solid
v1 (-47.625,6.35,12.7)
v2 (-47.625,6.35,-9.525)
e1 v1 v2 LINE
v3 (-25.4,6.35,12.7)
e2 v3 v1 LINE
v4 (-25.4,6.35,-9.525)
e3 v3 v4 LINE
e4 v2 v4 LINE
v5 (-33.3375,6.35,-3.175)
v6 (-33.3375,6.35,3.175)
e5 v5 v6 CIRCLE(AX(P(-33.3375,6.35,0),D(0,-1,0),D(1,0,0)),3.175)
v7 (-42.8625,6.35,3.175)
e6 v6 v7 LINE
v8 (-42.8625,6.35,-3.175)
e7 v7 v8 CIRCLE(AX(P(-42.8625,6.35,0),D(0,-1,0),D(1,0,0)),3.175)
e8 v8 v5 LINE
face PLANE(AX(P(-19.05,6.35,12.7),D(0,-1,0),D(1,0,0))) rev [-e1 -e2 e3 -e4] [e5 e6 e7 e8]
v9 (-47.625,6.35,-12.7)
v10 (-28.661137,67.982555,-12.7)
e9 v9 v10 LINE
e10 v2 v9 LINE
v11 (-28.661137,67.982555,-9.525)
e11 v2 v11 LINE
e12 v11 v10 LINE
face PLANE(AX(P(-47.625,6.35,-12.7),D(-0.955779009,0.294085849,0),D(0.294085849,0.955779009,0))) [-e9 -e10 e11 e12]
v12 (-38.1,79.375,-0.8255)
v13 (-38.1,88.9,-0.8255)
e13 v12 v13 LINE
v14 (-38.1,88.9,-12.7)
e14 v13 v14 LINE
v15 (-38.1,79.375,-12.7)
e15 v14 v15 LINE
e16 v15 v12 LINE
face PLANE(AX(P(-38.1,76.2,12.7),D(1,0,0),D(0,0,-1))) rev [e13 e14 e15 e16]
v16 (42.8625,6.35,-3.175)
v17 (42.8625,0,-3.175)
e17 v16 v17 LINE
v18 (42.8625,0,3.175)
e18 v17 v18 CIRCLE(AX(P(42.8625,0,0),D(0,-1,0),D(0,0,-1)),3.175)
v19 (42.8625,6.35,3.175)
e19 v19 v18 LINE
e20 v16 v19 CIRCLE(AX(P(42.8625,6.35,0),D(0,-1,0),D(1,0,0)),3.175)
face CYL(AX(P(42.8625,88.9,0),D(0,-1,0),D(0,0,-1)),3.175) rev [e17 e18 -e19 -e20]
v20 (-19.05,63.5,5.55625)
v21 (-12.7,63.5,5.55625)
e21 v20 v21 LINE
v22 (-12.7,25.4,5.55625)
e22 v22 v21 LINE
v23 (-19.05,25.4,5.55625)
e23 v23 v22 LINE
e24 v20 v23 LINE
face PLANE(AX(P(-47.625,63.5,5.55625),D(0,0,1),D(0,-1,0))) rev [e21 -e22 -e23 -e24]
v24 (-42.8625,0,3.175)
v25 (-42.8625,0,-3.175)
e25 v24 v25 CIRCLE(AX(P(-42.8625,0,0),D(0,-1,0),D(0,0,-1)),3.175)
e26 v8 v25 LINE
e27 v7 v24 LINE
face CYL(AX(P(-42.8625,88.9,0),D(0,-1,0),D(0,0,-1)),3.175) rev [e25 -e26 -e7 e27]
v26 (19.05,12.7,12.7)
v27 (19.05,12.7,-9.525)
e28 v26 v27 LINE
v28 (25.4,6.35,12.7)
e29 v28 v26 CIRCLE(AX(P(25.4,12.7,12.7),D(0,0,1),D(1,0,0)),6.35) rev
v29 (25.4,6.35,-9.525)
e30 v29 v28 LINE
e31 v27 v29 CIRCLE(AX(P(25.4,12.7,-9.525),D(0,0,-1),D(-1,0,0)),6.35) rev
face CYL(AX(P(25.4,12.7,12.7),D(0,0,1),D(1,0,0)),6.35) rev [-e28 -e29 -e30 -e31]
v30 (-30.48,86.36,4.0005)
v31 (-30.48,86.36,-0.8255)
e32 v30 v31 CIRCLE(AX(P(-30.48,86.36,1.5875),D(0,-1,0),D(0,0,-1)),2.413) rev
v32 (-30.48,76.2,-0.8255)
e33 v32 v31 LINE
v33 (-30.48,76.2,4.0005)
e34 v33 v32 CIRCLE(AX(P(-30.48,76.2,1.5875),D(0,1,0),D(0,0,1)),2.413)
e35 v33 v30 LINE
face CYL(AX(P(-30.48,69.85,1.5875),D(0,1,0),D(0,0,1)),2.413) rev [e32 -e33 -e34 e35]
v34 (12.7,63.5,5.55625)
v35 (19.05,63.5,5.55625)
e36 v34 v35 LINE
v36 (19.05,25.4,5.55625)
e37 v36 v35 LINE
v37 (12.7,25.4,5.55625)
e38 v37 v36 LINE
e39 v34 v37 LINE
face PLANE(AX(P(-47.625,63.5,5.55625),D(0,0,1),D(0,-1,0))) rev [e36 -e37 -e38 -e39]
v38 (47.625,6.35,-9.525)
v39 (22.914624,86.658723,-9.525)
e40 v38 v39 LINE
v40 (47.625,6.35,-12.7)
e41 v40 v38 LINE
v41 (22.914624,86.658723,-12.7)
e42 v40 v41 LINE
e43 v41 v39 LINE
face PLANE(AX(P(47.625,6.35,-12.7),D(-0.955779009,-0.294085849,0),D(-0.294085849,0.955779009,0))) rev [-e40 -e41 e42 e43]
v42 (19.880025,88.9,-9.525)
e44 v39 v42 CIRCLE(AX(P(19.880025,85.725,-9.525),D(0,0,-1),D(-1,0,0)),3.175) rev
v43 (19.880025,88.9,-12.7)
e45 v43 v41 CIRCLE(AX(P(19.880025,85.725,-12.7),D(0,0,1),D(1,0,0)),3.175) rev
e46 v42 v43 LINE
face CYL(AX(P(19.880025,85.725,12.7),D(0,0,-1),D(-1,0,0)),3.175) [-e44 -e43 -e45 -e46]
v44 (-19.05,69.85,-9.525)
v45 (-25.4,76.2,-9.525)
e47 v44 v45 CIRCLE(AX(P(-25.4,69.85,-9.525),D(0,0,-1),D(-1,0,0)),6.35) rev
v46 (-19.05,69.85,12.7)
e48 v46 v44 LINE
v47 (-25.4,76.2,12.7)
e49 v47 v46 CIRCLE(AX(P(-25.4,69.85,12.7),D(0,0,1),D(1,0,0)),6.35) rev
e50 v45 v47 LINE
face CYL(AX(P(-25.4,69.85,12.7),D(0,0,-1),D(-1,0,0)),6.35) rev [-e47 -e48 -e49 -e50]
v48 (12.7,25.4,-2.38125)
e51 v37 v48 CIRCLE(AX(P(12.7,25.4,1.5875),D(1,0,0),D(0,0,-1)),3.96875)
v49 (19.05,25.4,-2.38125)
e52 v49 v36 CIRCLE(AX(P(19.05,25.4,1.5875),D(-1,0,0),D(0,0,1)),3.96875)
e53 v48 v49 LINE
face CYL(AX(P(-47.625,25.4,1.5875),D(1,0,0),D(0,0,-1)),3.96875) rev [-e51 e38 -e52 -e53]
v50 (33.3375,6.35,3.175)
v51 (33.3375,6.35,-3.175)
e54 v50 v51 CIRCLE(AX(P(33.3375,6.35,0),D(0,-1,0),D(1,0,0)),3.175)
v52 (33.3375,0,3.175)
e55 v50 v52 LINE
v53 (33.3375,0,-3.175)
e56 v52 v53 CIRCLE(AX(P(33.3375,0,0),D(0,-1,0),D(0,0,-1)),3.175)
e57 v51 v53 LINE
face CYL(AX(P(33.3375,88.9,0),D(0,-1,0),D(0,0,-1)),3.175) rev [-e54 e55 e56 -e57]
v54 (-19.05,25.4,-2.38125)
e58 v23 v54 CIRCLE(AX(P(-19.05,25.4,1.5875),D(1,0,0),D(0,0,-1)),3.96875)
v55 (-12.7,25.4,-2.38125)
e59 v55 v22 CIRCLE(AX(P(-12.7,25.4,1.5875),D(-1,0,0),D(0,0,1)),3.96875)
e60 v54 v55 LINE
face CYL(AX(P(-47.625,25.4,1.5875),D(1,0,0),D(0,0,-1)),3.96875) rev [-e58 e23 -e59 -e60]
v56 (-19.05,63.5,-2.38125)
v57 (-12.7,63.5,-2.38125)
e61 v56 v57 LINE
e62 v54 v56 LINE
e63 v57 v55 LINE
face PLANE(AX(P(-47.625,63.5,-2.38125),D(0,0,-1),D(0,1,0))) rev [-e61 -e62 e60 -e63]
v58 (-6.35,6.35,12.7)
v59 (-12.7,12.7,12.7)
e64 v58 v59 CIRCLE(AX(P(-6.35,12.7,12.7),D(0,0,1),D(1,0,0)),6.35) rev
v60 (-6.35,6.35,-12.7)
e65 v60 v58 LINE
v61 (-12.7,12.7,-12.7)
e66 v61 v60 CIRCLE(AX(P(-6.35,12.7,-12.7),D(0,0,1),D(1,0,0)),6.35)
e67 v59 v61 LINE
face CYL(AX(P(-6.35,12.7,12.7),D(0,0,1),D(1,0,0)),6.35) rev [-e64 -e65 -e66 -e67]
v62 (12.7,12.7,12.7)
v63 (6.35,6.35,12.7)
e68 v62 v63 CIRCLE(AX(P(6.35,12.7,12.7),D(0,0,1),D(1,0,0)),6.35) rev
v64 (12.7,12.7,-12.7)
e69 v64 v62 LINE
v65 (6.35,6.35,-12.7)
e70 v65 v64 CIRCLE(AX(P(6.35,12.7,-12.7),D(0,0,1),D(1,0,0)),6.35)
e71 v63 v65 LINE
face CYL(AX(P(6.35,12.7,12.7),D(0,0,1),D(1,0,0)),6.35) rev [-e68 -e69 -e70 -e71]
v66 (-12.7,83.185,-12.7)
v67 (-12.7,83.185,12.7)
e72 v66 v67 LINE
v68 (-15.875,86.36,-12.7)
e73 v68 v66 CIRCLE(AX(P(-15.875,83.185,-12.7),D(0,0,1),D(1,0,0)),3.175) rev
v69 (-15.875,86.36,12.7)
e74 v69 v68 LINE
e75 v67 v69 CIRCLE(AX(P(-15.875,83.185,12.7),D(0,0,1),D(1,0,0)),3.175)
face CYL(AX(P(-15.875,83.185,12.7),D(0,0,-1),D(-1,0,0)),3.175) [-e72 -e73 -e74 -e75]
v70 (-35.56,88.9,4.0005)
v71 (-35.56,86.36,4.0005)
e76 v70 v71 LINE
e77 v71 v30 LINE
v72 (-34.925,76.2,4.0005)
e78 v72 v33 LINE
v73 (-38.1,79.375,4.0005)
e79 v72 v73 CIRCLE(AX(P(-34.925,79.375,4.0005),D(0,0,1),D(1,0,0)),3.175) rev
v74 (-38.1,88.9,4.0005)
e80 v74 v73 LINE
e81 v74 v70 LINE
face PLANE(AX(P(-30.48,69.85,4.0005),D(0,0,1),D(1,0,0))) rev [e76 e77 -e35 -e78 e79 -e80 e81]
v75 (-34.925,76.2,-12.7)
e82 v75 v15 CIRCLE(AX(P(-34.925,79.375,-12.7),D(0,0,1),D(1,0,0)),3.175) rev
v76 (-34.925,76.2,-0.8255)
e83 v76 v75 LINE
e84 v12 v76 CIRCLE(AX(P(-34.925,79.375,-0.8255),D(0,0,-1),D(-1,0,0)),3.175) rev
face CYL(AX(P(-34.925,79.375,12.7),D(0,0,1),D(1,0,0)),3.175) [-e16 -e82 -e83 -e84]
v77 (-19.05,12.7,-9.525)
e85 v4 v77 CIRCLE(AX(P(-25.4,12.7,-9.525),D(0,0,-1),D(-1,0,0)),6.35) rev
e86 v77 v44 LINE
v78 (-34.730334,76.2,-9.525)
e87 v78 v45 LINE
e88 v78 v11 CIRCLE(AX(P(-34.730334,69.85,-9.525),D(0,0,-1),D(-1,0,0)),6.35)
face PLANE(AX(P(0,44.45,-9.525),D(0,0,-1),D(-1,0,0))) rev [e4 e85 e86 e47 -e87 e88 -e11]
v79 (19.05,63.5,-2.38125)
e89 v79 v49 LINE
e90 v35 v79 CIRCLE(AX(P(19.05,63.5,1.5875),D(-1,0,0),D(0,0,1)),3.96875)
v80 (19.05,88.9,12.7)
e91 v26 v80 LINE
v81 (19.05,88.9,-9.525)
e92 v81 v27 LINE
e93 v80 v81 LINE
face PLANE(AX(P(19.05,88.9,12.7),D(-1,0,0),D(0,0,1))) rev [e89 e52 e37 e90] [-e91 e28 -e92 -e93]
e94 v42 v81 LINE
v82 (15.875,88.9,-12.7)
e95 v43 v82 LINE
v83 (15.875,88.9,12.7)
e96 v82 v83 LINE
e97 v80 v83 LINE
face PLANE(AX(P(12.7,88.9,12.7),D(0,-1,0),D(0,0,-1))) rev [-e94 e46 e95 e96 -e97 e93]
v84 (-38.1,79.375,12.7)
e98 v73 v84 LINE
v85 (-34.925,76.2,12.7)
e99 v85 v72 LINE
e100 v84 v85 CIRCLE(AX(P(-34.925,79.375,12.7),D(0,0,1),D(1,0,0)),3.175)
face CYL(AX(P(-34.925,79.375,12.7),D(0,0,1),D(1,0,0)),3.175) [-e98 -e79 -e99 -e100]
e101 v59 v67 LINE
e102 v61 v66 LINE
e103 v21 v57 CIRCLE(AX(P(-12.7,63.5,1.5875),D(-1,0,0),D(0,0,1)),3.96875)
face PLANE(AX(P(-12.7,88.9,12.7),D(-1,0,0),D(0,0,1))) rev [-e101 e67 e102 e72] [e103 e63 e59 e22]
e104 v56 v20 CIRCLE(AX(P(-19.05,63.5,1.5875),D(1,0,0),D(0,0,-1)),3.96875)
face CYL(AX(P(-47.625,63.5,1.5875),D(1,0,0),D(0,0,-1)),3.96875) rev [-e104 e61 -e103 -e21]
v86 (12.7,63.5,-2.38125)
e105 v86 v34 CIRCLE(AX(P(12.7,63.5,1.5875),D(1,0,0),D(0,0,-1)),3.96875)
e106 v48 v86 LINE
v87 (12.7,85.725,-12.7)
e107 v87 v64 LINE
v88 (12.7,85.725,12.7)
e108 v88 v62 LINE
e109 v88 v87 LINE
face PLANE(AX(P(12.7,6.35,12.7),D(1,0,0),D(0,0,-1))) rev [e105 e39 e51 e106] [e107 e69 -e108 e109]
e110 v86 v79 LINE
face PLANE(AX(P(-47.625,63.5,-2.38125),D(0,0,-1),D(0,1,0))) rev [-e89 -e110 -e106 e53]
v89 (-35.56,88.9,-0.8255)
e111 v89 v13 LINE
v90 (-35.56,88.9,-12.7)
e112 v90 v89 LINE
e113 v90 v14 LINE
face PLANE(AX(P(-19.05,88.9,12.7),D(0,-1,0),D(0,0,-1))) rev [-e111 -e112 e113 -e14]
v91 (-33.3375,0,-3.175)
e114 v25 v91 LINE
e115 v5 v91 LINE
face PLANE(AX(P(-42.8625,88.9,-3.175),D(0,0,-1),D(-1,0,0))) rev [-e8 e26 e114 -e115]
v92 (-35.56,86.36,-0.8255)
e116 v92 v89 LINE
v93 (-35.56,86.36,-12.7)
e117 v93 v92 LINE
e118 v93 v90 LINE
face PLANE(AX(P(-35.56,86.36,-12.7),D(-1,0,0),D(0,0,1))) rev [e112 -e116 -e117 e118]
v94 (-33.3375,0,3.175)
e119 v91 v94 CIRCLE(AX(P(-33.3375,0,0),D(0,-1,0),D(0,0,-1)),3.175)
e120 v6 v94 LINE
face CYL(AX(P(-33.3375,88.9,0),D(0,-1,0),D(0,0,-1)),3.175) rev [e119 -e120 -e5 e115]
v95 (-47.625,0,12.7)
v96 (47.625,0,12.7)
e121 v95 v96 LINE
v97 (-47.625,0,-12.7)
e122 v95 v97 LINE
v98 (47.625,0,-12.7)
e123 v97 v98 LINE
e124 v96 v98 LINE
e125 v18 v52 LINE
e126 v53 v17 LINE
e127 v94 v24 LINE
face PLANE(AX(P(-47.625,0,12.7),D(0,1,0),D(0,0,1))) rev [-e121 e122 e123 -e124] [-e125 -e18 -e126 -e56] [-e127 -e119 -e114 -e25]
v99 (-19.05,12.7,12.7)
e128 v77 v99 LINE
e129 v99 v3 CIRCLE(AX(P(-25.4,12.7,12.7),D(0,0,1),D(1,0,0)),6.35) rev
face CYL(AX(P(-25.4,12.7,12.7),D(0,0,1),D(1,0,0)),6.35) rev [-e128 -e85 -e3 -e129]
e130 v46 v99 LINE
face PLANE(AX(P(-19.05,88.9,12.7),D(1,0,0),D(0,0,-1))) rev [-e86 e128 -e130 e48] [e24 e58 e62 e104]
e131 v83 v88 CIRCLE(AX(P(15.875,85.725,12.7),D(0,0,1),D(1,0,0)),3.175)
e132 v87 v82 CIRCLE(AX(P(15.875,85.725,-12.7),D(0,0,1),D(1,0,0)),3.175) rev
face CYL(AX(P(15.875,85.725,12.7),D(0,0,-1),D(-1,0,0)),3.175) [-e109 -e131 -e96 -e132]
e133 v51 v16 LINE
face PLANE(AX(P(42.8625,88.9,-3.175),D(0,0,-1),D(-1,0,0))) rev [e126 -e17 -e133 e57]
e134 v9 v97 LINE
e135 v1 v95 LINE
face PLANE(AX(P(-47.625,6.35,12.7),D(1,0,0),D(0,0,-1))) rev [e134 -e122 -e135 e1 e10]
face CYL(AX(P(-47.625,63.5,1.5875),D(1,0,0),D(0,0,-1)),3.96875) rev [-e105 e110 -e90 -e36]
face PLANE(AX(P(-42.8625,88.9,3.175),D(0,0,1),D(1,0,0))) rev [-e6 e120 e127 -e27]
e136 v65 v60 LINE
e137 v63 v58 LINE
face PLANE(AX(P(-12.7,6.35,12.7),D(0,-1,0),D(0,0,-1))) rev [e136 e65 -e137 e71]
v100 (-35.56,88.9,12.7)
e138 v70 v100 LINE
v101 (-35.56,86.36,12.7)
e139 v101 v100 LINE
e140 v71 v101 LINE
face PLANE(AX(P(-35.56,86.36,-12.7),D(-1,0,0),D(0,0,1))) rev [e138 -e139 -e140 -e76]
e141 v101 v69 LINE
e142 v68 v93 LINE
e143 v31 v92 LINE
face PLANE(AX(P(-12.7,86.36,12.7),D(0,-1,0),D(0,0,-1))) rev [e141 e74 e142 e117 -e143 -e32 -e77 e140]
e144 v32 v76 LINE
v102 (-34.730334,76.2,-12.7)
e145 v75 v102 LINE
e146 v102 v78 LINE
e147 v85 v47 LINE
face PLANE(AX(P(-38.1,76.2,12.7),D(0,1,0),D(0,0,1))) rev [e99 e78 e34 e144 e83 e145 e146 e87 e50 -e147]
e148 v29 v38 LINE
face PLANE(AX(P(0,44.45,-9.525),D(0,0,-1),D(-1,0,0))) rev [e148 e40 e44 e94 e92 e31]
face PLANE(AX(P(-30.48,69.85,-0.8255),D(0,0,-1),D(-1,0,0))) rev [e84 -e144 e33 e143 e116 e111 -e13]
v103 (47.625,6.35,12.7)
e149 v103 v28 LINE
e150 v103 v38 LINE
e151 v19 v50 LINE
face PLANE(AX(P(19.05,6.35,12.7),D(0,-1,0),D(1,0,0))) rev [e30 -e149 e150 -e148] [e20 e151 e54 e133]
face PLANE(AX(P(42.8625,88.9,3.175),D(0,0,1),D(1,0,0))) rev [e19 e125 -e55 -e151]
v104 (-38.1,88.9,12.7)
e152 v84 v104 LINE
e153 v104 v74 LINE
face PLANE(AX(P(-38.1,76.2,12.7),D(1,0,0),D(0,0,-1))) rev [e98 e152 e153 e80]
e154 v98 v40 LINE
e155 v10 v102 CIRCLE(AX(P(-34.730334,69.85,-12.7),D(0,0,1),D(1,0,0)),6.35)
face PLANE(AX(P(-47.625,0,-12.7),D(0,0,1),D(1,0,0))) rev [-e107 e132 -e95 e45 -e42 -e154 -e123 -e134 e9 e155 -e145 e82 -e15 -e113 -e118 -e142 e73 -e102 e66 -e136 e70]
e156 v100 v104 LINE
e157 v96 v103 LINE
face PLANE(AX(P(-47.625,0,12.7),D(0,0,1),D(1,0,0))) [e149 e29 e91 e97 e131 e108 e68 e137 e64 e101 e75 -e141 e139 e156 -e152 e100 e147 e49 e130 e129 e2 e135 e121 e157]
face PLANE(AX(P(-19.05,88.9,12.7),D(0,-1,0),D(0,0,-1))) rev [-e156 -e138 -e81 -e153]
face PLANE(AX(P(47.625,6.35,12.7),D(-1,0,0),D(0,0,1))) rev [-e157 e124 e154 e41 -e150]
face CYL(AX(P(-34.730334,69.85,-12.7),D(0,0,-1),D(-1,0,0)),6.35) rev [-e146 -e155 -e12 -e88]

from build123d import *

# Parameters (mm, degrees)
BOSS_EXTRUDE1_DEPTH     = 12.7
RIB3_START              = -3.175
RIB3_DEPTH              = 3.175
CUT_EXTRUDE3_DEPTH      = 102.649597269
CUT_EXTRUDE3_DEPTH_BACK = 102.649597269
CUT_EXTRUDE4_DEPTH      = 102.649597269
SKETCH6_W               = 25.4
SKETCH6_H               = 12.7
BOSS_EXTRUDE2_DEPTH     = 19.05
CUT_EXTRUDE5_DEPTH      = 19.05
SKETCH9_W               = 22.86
SKETCH9_H               = 25.4
CUT_EXTRUDE6_DEPTH      = 2.54
FILLET4_R               = 3.175
FILLET5_R               = 6.35


# Read off the part's stored shape, not the designer's step: Rib3
with BuildPart() as part:
    # Sketch1 → Boss-Extrude1 (new, symmetric)
    with BuildSketch(Plane.XY):
        Polygon((-47.625, 0), (47.625, 0), (47.625, 6.35), (19.05, 6.35), (19.05, 88.9), (12.7, 88.9), (12.7, 6.35), (-12.7, 6.35), (-12.7, 88.9), (-19.05, 88.9), (-19.05, 6.35), (-47.625, 6.35), align=None)
    extrude(amount=BOSS_EXTRUDE1_DEPTH, both=True)

    # Rib3 outline → Rib3 (add)
    with BuildSketch(Plane(origin=(0, 0, -12.7), x_dir=(-1, 0, 0), z_dir=(0, 0, -1)).offset(RIB3_START)):
        Polygon((-19.05, 88.9), (-22.225, 88.9), (-47.625, 6.35), (-19.05, 6.35), align=None)
    rib3 = extrude(amount=RIB3_DEPTH)

    # Mirror1: Rib3 across plane
    add(rib3.mirror(Plane(origin=(0, 0, 0), x_dir=(0, 0, 1), z_dir=(1, 0, 0))))

    # Sketch4 → Cut-Extrude3 (cut, two sides: drawn at the far end of the back side and taken through both)
    with BuildSketch(Plane(origin=(0, 0, 0), x_dir=(0, 0, -1), z_dir=(1, 0, 0)).offset(-CUT_EXTRUDE3_DEPTH_BACK)):
        with BuildLine():
            Line((2.38125, 63.5), (2.38125, 25.4))
            ThreePointArc((2.38125, 25.4), (-1.5875, 21.43125), (-5.55625, 25.4))
            Line((-5.55625, 25.4), (-5.55625, 63.5))
            ThreePointArc((-5.55625, 63.5), (-1.5875, 67.46875), (2.38125, 63.5))
        make_face()
    extrude(amount=CUT_EXTRUDE3_DEPTH + CUT_EXTRUDE3_DEPTH_BACK, mode=Mode.SUBTRACT)

    # Sketch5 → Cut-Extrude4 (cut, through all)
    with BuildSketch(Plane.XZ):
        with BuildLine():
            Line((-42.8625, 3.175), (-33.3375, 3.175))
            ThreePointArc((-33.3375, 3.175), (-30.1625, 0), (-33.3375, -3.175))
            Line((-33.3375, -3.175), (-42.8625, -3.175))
            ThreePointArc((-42.8625, -3.175), (-46.0375, 0), (-42.8625, 3.175))
        make_face()
        with BuildLine():
            Line((42.8625, -3.175), (33.3375, -3.175))
            ThreePointArc((33.3375, -3.175), (30.1625, 0), (33.3375, 3.175))
            Line((33.3375, 3.175), (42.8625, 3.175))
            ThreePointArc((42.8625, 3.175), (46.0375, 0), (42.8625, -3.175))
        make_face()
    extrude(amount=-CUT_EXTRUDE4_DEPTH, mode=Mode.SUBTRACT)

    # Sketch6 → Boss-Extrude2 (add)
    with BuildSketch(Plane.ZY.offset(19.05)):
        with Locations((0, 82.55)):
            Rectangle(SKETCH6_W, SKETCH6_H)
    extrude(amount=BOSS_EXTRUDE2_DEPTH)

    # Sketch7 → Cut-Extrude5 (cut)
    with BuildSketch(Plane(origin=(0, 88.9, 0), x_dir=(1, 0, 0), z_dir=(0, 1, 0))):
        with BuildLine():
            Line((-30.48, -4.0005), (-43.18, -4.0005))
            ThreePointArc((-43.18, -4.0005), (-45.593, -1.5875), (-43.18, 0.8255))
            Line((-43.18, 0.8255), (-30.48, 0.8255))
            ThreePointArc((-30.48, 0.8255), (-28.067, -1.5875), (-30.48, -4.0005))
        make_face()
    extrude(amount=-CUT_EXTRUDE5_DEPTH, mode=Mode.SUBTRACT)

    # Sketch9 → Cut-Extrude6 (cut)
    with BuildSketch(Plane(origin=(0, 88.9, 0), x_dir=(1, 0, 0), z_dir=(0, 1, 0))):
        with Locations((-24.13, 0)):
            Rectangle(SKETCH9_W, SKETCH9_H)
    extrude(amount=-CUT_EXTRUDE6_DEPTH, mode=Mode.SUBTRACT)

    # Fillet4
    fillet4_edges = [part.edges().sort_by_distance(p)[0] for p in [
        (-38.1, 76.2, -6.76275),
        (-38.1, 76.2, 8.35025),
        (12.7, 88.9, 0),
        (-12.7, 86.36, 0),
        (22.225, 88.9, -11.1125),
    ]]
    fillet(fillet4_edges, radius=FILLET4_R)

    # Fillet5
    fillet5_edges = [part.edges().sort_by_distance(p)[0] for p in [
        (-26.132692308, 76.2, -11.1125),
        (-19.05, 76.2, 1.5875),
        (-19.05, 6.35, 1.5875),
        (-12.7, 6.35, 0),
        (12.7, 6.35, 0),
        (19.05, 6.35, 1.5875),
    ]]
    fillet(fillet5_edges, radius=FILLET5_R)


solid = part.part
